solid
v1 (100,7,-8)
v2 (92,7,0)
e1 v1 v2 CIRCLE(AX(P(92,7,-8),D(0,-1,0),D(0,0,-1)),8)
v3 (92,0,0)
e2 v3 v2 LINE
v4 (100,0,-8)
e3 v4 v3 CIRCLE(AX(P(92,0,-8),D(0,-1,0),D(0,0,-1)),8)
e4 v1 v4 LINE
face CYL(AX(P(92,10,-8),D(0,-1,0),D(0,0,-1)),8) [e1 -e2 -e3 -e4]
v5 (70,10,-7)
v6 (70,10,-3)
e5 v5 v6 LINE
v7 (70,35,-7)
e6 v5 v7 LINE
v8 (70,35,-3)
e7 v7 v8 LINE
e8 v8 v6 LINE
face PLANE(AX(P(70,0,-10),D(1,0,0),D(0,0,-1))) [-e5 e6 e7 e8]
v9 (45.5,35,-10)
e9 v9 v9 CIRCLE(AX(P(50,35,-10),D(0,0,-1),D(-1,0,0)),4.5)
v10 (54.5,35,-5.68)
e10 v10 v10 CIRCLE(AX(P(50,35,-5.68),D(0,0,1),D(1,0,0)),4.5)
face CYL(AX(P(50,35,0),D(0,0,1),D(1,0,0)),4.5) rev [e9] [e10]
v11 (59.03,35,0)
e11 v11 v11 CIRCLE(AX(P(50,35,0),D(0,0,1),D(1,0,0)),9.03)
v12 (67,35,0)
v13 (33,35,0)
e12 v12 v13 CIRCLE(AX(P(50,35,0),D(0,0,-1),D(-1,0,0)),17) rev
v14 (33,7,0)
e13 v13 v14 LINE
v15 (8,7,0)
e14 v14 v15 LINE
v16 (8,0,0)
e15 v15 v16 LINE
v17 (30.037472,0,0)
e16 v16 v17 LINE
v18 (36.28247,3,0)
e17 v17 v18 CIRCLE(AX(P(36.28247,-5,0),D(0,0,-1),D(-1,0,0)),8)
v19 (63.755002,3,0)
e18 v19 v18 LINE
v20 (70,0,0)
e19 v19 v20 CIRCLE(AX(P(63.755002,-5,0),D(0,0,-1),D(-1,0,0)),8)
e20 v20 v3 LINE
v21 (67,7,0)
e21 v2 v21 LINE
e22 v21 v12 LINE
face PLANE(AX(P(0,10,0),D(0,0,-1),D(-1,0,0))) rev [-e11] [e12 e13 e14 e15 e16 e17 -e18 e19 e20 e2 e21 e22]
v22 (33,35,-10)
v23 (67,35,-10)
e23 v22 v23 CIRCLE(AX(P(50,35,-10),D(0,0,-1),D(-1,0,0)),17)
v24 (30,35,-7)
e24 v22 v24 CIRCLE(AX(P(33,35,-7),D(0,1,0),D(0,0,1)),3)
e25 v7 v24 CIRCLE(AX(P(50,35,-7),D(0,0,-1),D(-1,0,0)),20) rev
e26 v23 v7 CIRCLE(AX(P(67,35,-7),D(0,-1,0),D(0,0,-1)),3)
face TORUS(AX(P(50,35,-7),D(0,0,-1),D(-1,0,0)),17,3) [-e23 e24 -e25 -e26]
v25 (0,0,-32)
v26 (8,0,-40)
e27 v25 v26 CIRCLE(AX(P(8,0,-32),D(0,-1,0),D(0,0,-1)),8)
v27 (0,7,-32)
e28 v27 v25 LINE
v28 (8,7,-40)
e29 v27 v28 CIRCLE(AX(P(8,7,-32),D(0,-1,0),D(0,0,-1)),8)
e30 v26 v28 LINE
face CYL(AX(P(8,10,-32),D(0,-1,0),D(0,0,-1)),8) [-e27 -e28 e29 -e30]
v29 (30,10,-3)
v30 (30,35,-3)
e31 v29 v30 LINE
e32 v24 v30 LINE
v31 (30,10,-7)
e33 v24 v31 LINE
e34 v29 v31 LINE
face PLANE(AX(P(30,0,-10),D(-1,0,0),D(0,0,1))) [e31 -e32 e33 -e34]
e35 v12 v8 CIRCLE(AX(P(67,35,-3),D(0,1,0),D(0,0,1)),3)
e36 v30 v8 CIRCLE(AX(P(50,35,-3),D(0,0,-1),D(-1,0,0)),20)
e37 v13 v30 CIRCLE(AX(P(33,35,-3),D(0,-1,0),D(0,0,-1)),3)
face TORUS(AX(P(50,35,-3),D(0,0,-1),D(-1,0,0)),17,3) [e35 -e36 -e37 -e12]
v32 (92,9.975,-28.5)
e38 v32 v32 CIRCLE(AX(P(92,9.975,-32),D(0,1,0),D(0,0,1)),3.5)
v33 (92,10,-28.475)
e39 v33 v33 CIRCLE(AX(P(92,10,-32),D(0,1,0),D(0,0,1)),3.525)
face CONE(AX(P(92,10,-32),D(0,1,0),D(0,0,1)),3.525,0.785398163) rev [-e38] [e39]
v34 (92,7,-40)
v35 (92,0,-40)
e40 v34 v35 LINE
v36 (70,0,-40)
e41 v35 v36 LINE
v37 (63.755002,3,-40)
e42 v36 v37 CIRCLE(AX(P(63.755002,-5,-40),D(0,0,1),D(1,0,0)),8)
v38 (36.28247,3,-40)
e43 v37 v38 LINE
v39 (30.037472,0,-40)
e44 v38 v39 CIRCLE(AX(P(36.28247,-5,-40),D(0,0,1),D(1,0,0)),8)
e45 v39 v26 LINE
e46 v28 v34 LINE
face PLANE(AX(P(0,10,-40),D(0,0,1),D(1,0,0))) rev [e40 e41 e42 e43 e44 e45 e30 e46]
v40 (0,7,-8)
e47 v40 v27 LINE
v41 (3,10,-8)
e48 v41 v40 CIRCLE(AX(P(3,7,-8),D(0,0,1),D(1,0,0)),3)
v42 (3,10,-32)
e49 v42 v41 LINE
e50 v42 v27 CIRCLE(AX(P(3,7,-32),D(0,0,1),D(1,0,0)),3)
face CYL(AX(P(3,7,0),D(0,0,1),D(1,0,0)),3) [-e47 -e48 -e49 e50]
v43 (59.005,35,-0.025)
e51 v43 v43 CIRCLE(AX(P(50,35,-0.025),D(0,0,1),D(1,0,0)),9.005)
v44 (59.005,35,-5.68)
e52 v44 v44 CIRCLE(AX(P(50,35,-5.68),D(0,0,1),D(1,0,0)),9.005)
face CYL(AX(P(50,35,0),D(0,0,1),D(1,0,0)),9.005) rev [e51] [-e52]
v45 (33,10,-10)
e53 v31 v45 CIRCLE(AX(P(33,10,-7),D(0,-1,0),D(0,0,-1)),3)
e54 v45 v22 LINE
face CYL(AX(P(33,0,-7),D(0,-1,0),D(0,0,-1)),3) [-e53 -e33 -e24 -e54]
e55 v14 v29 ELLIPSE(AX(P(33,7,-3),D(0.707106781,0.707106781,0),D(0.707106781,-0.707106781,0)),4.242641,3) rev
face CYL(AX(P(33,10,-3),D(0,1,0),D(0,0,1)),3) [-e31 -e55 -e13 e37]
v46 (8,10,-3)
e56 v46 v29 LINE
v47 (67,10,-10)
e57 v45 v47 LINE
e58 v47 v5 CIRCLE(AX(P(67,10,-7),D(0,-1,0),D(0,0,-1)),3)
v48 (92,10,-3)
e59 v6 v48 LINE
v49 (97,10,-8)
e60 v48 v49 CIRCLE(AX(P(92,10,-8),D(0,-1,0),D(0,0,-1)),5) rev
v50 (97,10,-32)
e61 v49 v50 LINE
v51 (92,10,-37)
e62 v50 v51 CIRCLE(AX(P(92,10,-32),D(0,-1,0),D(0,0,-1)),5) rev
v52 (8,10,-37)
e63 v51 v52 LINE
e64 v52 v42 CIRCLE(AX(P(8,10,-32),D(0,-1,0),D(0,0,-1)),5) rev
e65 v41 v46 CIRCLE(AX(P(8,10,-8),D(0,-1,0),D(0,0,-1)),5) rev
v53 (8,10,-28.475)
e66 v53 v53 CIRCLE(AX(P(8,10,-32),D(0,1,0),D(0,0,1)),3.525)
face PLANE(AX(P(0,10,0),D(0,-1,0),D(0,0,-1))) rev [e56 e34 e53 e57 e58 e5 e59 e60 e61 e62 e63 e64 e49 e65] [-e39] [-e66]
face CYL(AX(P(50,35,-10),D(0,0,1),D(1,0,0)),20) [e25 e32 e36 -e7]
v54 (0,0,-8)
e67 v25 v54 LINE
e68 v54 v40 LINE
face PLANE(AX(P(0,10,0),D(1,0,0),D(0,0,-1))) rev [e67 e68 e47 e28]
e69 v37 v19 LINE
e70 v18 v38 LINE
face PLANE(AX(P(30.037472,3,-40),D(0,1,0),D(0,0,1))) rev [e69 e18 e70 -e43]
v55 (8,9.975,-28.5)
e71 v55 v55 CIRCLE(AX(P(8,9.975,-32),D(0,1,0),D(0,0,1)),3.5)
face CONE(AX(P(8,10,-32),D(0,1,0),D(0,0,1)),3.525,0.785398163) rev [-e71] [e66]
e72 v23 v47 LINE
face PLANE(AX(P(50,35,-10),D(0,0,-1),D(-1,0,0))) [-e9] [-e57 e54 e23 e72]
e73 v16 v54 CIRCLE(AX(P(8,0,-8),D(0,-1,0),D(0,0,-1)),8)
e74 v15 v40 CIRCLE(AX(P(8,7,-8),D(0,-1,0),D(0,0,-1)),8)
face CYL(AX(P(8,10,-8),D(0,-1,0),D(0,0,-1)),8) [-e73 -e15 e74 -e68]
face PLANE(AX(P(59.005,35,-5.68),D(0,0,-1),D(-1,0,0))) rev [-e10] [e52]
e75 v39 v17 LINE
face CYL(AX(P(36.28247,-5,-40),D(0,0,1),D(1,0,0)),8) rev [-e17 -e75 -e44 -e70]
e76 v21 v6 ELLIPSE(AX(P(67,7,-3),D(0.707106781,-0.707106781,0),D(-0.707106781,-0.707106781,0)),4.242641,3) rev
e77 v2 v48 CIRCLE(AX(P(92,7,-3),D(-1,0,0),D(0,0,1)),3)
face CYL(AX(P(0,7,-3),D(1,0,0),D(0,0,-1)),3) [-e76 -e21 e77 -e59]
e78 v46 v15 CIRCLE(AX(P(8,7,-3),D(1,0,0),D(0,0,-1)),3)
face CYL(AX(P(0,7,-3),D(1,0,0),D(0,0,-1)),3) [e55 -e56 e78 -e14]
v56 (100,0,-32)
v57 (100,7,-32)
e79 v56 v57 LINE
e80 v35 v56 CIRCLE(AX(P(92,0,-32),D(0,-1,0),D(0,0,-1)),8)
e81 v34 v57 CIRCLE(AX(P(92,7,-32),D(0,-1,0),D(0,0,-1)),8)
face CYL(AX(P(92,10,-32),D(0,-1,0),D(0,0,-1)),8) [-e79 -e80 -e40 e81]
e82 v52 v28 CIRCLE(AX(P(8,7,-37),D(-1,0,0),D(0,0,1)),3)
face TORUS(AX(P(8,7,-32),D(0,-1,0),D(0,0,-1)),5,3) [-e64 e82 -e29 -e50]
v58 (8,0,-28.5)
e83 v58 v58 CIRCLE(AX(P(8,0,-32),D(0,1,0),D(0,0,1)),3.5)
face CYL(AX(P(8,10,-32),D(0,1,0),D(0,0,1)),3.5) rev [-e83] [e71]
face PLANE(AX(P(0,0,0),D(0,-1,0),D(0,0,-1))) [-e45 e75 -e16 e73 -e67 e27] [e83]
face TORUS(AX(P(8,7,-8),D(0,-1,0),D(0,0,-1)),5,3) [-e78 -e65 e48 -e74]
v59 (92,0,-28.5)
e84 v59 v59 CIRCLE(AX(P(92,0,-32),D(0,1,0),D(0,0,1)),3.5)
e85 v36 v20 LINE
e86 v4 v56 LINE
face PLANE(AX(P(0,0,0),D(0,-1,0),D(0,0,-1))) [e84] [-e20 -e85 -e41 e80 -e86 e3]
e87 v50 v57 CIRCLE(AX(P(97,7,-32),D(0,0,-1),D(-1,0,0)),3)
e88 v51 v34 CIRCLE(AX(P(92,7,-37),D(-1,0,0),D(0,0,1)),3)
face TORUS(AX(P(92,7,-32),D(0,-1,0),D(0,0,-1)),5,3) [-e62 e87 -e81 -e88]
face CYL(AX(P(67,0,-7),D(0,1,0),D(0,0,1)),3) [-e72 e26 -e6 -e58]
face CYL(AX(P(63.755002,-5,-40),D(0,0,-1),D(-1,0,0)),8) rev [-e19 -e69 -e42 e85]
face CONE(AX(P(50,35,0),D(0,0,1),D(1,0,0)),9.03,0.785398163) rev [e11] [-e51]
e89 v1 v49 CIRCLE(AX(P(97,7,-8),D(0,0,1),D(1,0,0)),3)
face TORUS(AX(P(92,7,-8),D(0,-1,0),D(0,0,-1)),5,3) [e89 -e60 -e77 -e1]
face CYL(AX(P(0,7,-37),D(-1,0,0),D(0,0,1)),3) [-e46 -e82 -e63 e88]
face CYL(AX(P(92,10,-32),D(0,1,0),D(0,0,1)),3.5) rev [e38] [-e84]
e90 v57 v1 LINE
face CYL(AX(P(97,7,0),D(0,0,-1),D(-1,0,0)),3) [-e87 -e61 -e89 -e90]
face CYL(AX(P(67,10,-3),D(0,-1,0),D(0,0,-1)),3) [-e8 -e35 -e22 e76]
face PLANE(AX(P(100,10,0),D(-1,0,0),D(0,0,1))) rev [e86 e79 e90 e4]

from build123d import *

# Parameters (mm, degrees)
ESBO_O1_W                            = 100
ESBO_O1_H                            = 40
RESSALTO_EXTRUS_O1_DEPTH             = 10
RESSALTO_EXTRUS_O2_DEPTH             = 10
ESBO_O3_W                            = 39.962527671
ESBO_O3_H                            = 3
CORTE_EXTRUS_O1_DEPTH                = 121.933866224
FILETE1_R                            = 8
FURO_DE_DI_METRO_7_0_7_1_D           = 7
FURO_DE_DI_METRO_7_0_7_1_CSINK_D     = 7.05
FURO_DE_DI_METRO_7_0_7_1_CSINK_ANGLE = 90
FURO_DE_DI_METRO_7_0_7_3_D           = 7
FURO_DE_DI_METRO_7_0_7_3_CSINK_D     = 7.05
FURO_DE_DI_METRO_7_0_7_3_CSINK_ANGLE = 90
FILETE3_R                            = 3


with BuildPart() as part:
    # Esboço1 → Ressalto-extrusão1 (new body)
    with BuildSketch(Plane(origin=(0, 0, 0), x_dir=(1, 0, 0), z_dir=(0, 1, 0))):
        with Locations((50, 20)):
            Rectangle(ESBO_O1_W, ESBO_O1_H)
    extrude(amount=RESSALTO_EXTRUS_O1_DEPTH)

    # Esboço2 → Ressalto-extrusão2 (add)
    with BuildSketch(Plane.XY):
        with BuildLine():
            Line((30, 0), (30, 35))
            ThreePointArc((30, 35), (50, 55), (70, 35))
            Line((70, 35), (70, 0))
            Line((70, 0), (30, 0))
        make_face()
    extrude(amount=-RESSALTO_EXTRUS_O2_DEPTH)

    # Esboço3 → Corte-extrusão1 (cut, through all)
    with BuildSketch(Plane.XY):
        with Locations((50.018736164, 1.5)):
            Rectangle(ESBO_O3_W, ESBO_O3_H)
    extrude(amount=-CORTE_EXTRUS_O1_DEPTH, mode=Mode.SUBTRACT)

    # Filete1
    # the kernel refuses this fillet: 8 mm, written as the material it adds along each edge
    with BuildSketch(Plane(origin=(70, 3, 0), x_dir=(-1, 0, 0), z_dir=(0, 0, -1))) as filete1_piece_1:
        with BuildLine():
            CenterArc((6.244997998, -8), FILETE1_R, 90, 51.317812547)
            Line((0, -3), (0, 0))
            Line((0, 0), (6.244997998, 0))
        make_face()
    extrude(amount=40)
    with BuildSketch(Plane(origin=(30.037472329, 3, 0), x_dir=(0, -1, 0), z_dir=(0, 0, -1))) as filete1_piece_2:
        with BuildLine():
            CenterArc((8, -6.244997998), FILETE1_R, 128.682187453, 51.317812547)
            Line((0, -6.244997998), (0, 0))
            Line((0, 0), (3, 0))
        make_face()
    extrude(amount=40)
    # the kernel refuses this fillet: 8 mm, written as the material it takes off along each edge
    with BuildSketch(Plane(origin=(100, -20, 0), x_dir=(-1, 0, 0), z_dir=(0, 1, 0)), Plane(origin=(100, -20, -40), x_dir=(0, 0, 1), z_dir=(0, 1, 0))) as filete1_2_piece_1:
        with BuildLine():
            CenterArc((FILETE1_R, -FILETE1_R), FILETE1_R, 90, 90)
            Line((0, -FILETE1_R), (0, 0))
            Line((0, 0), (FILETE1_R, 0))
        make_face()
    extrude(amount=50, mode=Mode.SUBTRACT)
    with BuildSketch(Plane(origin=(0, -20, -40), x_dir=(0, 0, 1), z_dir=(0, 1, 0)), Plane(origin=(0, -20, 0), x_dir=(1, 0, 0), z_dir=(0, 1, 0))) as filete1_2_piece_2:
        with BuildLine():
            CenterArc((FILETE1_R, FILETE1_R), FILETE1_R, 180, 90)
            Line((0, FILETE1_R), (0, 0))
            Line((0, 0), (FILETE1_R, 0))
        make_face()
    extrude(amount=50, mode=Mode.SUBTRACT)

    # Furo de diâmetro Ø7.0 (7)1 (through all)
    with Locations(Plane(origin=(0, 10, 0), x_dir=(1, 0, 0), z_dir=(0, 1, 0))):
        with Locations((8, 32)):
            CounterSinkHole(FURO_DE_DI_METRO_7_0_7_1_D / 2, FURO_DE_DI_METRO_7_0_7_1_CSINK_D / 2, counter_sink_angle=FURO_DE_DI_METRO_7_0_7_1_CSINK_ANGLE)

    # Furo de diâmetro Ø7.0 (7)3 (through all)
    with Locations(Plane(origin=(0, 10, 0), x_dir=(1, 0, 0), z_dir=(0, 1, 0))):
        with Locations((92, 32)):
            CounterSinkHole(FURO_DE_DI_METRO_7_0_7_3_D / 2, FURO_DE_DI_METRO_7_0_7_3_CSINK_D / 2, counter_sink_angle=FURO_DE_DI_METRO_7_0_7_3_CSINK_ANGLE)

    # Esboço16 → Rebaixo para parafuso de cabeça sextavada de M81 (revolve, cut)
    with BuildSketch(Plane(origin=(50, 35, 0), x_dir=(0, -1, 0), z_dir=(1, 0, 0))):
        Polygon((0, 0), (0, 40), (4.5, 40), (4.5, 5.68), (9.005, 5.68), (9.005, 0.025), (9.03, 0), align=None)
    revolve(axis=Axis((50, 35, 6.35), (0, 0, -1)), mode=Mode.SUBTRACT)

    # Filete3
    filete3_edges = [part.edges().sort_by_distance(p)[0] for p in [
        (81, 10, 0),
        (30, 22.5, -10),
        (70, 22.5, -10),
        (30, 22.5, 0),
        (70, 22.5, 0),
        (50, 55, 0),
        (50, 55, -10),
        (100, 10, -20),
        (19, 10, 0),
        (50, 10, -40),
        (0, 10, -20),
        (2.343145751, 10, -2.343145751),
        (2.343145751, 10, -37.656854249),
        (97.656854249, 10, -37.656854249),
        (97.656854249, 10, -2.343145751),
    ]]
    fillet(filete3_edges, radius=FILETE3_R)


solid = part.part
